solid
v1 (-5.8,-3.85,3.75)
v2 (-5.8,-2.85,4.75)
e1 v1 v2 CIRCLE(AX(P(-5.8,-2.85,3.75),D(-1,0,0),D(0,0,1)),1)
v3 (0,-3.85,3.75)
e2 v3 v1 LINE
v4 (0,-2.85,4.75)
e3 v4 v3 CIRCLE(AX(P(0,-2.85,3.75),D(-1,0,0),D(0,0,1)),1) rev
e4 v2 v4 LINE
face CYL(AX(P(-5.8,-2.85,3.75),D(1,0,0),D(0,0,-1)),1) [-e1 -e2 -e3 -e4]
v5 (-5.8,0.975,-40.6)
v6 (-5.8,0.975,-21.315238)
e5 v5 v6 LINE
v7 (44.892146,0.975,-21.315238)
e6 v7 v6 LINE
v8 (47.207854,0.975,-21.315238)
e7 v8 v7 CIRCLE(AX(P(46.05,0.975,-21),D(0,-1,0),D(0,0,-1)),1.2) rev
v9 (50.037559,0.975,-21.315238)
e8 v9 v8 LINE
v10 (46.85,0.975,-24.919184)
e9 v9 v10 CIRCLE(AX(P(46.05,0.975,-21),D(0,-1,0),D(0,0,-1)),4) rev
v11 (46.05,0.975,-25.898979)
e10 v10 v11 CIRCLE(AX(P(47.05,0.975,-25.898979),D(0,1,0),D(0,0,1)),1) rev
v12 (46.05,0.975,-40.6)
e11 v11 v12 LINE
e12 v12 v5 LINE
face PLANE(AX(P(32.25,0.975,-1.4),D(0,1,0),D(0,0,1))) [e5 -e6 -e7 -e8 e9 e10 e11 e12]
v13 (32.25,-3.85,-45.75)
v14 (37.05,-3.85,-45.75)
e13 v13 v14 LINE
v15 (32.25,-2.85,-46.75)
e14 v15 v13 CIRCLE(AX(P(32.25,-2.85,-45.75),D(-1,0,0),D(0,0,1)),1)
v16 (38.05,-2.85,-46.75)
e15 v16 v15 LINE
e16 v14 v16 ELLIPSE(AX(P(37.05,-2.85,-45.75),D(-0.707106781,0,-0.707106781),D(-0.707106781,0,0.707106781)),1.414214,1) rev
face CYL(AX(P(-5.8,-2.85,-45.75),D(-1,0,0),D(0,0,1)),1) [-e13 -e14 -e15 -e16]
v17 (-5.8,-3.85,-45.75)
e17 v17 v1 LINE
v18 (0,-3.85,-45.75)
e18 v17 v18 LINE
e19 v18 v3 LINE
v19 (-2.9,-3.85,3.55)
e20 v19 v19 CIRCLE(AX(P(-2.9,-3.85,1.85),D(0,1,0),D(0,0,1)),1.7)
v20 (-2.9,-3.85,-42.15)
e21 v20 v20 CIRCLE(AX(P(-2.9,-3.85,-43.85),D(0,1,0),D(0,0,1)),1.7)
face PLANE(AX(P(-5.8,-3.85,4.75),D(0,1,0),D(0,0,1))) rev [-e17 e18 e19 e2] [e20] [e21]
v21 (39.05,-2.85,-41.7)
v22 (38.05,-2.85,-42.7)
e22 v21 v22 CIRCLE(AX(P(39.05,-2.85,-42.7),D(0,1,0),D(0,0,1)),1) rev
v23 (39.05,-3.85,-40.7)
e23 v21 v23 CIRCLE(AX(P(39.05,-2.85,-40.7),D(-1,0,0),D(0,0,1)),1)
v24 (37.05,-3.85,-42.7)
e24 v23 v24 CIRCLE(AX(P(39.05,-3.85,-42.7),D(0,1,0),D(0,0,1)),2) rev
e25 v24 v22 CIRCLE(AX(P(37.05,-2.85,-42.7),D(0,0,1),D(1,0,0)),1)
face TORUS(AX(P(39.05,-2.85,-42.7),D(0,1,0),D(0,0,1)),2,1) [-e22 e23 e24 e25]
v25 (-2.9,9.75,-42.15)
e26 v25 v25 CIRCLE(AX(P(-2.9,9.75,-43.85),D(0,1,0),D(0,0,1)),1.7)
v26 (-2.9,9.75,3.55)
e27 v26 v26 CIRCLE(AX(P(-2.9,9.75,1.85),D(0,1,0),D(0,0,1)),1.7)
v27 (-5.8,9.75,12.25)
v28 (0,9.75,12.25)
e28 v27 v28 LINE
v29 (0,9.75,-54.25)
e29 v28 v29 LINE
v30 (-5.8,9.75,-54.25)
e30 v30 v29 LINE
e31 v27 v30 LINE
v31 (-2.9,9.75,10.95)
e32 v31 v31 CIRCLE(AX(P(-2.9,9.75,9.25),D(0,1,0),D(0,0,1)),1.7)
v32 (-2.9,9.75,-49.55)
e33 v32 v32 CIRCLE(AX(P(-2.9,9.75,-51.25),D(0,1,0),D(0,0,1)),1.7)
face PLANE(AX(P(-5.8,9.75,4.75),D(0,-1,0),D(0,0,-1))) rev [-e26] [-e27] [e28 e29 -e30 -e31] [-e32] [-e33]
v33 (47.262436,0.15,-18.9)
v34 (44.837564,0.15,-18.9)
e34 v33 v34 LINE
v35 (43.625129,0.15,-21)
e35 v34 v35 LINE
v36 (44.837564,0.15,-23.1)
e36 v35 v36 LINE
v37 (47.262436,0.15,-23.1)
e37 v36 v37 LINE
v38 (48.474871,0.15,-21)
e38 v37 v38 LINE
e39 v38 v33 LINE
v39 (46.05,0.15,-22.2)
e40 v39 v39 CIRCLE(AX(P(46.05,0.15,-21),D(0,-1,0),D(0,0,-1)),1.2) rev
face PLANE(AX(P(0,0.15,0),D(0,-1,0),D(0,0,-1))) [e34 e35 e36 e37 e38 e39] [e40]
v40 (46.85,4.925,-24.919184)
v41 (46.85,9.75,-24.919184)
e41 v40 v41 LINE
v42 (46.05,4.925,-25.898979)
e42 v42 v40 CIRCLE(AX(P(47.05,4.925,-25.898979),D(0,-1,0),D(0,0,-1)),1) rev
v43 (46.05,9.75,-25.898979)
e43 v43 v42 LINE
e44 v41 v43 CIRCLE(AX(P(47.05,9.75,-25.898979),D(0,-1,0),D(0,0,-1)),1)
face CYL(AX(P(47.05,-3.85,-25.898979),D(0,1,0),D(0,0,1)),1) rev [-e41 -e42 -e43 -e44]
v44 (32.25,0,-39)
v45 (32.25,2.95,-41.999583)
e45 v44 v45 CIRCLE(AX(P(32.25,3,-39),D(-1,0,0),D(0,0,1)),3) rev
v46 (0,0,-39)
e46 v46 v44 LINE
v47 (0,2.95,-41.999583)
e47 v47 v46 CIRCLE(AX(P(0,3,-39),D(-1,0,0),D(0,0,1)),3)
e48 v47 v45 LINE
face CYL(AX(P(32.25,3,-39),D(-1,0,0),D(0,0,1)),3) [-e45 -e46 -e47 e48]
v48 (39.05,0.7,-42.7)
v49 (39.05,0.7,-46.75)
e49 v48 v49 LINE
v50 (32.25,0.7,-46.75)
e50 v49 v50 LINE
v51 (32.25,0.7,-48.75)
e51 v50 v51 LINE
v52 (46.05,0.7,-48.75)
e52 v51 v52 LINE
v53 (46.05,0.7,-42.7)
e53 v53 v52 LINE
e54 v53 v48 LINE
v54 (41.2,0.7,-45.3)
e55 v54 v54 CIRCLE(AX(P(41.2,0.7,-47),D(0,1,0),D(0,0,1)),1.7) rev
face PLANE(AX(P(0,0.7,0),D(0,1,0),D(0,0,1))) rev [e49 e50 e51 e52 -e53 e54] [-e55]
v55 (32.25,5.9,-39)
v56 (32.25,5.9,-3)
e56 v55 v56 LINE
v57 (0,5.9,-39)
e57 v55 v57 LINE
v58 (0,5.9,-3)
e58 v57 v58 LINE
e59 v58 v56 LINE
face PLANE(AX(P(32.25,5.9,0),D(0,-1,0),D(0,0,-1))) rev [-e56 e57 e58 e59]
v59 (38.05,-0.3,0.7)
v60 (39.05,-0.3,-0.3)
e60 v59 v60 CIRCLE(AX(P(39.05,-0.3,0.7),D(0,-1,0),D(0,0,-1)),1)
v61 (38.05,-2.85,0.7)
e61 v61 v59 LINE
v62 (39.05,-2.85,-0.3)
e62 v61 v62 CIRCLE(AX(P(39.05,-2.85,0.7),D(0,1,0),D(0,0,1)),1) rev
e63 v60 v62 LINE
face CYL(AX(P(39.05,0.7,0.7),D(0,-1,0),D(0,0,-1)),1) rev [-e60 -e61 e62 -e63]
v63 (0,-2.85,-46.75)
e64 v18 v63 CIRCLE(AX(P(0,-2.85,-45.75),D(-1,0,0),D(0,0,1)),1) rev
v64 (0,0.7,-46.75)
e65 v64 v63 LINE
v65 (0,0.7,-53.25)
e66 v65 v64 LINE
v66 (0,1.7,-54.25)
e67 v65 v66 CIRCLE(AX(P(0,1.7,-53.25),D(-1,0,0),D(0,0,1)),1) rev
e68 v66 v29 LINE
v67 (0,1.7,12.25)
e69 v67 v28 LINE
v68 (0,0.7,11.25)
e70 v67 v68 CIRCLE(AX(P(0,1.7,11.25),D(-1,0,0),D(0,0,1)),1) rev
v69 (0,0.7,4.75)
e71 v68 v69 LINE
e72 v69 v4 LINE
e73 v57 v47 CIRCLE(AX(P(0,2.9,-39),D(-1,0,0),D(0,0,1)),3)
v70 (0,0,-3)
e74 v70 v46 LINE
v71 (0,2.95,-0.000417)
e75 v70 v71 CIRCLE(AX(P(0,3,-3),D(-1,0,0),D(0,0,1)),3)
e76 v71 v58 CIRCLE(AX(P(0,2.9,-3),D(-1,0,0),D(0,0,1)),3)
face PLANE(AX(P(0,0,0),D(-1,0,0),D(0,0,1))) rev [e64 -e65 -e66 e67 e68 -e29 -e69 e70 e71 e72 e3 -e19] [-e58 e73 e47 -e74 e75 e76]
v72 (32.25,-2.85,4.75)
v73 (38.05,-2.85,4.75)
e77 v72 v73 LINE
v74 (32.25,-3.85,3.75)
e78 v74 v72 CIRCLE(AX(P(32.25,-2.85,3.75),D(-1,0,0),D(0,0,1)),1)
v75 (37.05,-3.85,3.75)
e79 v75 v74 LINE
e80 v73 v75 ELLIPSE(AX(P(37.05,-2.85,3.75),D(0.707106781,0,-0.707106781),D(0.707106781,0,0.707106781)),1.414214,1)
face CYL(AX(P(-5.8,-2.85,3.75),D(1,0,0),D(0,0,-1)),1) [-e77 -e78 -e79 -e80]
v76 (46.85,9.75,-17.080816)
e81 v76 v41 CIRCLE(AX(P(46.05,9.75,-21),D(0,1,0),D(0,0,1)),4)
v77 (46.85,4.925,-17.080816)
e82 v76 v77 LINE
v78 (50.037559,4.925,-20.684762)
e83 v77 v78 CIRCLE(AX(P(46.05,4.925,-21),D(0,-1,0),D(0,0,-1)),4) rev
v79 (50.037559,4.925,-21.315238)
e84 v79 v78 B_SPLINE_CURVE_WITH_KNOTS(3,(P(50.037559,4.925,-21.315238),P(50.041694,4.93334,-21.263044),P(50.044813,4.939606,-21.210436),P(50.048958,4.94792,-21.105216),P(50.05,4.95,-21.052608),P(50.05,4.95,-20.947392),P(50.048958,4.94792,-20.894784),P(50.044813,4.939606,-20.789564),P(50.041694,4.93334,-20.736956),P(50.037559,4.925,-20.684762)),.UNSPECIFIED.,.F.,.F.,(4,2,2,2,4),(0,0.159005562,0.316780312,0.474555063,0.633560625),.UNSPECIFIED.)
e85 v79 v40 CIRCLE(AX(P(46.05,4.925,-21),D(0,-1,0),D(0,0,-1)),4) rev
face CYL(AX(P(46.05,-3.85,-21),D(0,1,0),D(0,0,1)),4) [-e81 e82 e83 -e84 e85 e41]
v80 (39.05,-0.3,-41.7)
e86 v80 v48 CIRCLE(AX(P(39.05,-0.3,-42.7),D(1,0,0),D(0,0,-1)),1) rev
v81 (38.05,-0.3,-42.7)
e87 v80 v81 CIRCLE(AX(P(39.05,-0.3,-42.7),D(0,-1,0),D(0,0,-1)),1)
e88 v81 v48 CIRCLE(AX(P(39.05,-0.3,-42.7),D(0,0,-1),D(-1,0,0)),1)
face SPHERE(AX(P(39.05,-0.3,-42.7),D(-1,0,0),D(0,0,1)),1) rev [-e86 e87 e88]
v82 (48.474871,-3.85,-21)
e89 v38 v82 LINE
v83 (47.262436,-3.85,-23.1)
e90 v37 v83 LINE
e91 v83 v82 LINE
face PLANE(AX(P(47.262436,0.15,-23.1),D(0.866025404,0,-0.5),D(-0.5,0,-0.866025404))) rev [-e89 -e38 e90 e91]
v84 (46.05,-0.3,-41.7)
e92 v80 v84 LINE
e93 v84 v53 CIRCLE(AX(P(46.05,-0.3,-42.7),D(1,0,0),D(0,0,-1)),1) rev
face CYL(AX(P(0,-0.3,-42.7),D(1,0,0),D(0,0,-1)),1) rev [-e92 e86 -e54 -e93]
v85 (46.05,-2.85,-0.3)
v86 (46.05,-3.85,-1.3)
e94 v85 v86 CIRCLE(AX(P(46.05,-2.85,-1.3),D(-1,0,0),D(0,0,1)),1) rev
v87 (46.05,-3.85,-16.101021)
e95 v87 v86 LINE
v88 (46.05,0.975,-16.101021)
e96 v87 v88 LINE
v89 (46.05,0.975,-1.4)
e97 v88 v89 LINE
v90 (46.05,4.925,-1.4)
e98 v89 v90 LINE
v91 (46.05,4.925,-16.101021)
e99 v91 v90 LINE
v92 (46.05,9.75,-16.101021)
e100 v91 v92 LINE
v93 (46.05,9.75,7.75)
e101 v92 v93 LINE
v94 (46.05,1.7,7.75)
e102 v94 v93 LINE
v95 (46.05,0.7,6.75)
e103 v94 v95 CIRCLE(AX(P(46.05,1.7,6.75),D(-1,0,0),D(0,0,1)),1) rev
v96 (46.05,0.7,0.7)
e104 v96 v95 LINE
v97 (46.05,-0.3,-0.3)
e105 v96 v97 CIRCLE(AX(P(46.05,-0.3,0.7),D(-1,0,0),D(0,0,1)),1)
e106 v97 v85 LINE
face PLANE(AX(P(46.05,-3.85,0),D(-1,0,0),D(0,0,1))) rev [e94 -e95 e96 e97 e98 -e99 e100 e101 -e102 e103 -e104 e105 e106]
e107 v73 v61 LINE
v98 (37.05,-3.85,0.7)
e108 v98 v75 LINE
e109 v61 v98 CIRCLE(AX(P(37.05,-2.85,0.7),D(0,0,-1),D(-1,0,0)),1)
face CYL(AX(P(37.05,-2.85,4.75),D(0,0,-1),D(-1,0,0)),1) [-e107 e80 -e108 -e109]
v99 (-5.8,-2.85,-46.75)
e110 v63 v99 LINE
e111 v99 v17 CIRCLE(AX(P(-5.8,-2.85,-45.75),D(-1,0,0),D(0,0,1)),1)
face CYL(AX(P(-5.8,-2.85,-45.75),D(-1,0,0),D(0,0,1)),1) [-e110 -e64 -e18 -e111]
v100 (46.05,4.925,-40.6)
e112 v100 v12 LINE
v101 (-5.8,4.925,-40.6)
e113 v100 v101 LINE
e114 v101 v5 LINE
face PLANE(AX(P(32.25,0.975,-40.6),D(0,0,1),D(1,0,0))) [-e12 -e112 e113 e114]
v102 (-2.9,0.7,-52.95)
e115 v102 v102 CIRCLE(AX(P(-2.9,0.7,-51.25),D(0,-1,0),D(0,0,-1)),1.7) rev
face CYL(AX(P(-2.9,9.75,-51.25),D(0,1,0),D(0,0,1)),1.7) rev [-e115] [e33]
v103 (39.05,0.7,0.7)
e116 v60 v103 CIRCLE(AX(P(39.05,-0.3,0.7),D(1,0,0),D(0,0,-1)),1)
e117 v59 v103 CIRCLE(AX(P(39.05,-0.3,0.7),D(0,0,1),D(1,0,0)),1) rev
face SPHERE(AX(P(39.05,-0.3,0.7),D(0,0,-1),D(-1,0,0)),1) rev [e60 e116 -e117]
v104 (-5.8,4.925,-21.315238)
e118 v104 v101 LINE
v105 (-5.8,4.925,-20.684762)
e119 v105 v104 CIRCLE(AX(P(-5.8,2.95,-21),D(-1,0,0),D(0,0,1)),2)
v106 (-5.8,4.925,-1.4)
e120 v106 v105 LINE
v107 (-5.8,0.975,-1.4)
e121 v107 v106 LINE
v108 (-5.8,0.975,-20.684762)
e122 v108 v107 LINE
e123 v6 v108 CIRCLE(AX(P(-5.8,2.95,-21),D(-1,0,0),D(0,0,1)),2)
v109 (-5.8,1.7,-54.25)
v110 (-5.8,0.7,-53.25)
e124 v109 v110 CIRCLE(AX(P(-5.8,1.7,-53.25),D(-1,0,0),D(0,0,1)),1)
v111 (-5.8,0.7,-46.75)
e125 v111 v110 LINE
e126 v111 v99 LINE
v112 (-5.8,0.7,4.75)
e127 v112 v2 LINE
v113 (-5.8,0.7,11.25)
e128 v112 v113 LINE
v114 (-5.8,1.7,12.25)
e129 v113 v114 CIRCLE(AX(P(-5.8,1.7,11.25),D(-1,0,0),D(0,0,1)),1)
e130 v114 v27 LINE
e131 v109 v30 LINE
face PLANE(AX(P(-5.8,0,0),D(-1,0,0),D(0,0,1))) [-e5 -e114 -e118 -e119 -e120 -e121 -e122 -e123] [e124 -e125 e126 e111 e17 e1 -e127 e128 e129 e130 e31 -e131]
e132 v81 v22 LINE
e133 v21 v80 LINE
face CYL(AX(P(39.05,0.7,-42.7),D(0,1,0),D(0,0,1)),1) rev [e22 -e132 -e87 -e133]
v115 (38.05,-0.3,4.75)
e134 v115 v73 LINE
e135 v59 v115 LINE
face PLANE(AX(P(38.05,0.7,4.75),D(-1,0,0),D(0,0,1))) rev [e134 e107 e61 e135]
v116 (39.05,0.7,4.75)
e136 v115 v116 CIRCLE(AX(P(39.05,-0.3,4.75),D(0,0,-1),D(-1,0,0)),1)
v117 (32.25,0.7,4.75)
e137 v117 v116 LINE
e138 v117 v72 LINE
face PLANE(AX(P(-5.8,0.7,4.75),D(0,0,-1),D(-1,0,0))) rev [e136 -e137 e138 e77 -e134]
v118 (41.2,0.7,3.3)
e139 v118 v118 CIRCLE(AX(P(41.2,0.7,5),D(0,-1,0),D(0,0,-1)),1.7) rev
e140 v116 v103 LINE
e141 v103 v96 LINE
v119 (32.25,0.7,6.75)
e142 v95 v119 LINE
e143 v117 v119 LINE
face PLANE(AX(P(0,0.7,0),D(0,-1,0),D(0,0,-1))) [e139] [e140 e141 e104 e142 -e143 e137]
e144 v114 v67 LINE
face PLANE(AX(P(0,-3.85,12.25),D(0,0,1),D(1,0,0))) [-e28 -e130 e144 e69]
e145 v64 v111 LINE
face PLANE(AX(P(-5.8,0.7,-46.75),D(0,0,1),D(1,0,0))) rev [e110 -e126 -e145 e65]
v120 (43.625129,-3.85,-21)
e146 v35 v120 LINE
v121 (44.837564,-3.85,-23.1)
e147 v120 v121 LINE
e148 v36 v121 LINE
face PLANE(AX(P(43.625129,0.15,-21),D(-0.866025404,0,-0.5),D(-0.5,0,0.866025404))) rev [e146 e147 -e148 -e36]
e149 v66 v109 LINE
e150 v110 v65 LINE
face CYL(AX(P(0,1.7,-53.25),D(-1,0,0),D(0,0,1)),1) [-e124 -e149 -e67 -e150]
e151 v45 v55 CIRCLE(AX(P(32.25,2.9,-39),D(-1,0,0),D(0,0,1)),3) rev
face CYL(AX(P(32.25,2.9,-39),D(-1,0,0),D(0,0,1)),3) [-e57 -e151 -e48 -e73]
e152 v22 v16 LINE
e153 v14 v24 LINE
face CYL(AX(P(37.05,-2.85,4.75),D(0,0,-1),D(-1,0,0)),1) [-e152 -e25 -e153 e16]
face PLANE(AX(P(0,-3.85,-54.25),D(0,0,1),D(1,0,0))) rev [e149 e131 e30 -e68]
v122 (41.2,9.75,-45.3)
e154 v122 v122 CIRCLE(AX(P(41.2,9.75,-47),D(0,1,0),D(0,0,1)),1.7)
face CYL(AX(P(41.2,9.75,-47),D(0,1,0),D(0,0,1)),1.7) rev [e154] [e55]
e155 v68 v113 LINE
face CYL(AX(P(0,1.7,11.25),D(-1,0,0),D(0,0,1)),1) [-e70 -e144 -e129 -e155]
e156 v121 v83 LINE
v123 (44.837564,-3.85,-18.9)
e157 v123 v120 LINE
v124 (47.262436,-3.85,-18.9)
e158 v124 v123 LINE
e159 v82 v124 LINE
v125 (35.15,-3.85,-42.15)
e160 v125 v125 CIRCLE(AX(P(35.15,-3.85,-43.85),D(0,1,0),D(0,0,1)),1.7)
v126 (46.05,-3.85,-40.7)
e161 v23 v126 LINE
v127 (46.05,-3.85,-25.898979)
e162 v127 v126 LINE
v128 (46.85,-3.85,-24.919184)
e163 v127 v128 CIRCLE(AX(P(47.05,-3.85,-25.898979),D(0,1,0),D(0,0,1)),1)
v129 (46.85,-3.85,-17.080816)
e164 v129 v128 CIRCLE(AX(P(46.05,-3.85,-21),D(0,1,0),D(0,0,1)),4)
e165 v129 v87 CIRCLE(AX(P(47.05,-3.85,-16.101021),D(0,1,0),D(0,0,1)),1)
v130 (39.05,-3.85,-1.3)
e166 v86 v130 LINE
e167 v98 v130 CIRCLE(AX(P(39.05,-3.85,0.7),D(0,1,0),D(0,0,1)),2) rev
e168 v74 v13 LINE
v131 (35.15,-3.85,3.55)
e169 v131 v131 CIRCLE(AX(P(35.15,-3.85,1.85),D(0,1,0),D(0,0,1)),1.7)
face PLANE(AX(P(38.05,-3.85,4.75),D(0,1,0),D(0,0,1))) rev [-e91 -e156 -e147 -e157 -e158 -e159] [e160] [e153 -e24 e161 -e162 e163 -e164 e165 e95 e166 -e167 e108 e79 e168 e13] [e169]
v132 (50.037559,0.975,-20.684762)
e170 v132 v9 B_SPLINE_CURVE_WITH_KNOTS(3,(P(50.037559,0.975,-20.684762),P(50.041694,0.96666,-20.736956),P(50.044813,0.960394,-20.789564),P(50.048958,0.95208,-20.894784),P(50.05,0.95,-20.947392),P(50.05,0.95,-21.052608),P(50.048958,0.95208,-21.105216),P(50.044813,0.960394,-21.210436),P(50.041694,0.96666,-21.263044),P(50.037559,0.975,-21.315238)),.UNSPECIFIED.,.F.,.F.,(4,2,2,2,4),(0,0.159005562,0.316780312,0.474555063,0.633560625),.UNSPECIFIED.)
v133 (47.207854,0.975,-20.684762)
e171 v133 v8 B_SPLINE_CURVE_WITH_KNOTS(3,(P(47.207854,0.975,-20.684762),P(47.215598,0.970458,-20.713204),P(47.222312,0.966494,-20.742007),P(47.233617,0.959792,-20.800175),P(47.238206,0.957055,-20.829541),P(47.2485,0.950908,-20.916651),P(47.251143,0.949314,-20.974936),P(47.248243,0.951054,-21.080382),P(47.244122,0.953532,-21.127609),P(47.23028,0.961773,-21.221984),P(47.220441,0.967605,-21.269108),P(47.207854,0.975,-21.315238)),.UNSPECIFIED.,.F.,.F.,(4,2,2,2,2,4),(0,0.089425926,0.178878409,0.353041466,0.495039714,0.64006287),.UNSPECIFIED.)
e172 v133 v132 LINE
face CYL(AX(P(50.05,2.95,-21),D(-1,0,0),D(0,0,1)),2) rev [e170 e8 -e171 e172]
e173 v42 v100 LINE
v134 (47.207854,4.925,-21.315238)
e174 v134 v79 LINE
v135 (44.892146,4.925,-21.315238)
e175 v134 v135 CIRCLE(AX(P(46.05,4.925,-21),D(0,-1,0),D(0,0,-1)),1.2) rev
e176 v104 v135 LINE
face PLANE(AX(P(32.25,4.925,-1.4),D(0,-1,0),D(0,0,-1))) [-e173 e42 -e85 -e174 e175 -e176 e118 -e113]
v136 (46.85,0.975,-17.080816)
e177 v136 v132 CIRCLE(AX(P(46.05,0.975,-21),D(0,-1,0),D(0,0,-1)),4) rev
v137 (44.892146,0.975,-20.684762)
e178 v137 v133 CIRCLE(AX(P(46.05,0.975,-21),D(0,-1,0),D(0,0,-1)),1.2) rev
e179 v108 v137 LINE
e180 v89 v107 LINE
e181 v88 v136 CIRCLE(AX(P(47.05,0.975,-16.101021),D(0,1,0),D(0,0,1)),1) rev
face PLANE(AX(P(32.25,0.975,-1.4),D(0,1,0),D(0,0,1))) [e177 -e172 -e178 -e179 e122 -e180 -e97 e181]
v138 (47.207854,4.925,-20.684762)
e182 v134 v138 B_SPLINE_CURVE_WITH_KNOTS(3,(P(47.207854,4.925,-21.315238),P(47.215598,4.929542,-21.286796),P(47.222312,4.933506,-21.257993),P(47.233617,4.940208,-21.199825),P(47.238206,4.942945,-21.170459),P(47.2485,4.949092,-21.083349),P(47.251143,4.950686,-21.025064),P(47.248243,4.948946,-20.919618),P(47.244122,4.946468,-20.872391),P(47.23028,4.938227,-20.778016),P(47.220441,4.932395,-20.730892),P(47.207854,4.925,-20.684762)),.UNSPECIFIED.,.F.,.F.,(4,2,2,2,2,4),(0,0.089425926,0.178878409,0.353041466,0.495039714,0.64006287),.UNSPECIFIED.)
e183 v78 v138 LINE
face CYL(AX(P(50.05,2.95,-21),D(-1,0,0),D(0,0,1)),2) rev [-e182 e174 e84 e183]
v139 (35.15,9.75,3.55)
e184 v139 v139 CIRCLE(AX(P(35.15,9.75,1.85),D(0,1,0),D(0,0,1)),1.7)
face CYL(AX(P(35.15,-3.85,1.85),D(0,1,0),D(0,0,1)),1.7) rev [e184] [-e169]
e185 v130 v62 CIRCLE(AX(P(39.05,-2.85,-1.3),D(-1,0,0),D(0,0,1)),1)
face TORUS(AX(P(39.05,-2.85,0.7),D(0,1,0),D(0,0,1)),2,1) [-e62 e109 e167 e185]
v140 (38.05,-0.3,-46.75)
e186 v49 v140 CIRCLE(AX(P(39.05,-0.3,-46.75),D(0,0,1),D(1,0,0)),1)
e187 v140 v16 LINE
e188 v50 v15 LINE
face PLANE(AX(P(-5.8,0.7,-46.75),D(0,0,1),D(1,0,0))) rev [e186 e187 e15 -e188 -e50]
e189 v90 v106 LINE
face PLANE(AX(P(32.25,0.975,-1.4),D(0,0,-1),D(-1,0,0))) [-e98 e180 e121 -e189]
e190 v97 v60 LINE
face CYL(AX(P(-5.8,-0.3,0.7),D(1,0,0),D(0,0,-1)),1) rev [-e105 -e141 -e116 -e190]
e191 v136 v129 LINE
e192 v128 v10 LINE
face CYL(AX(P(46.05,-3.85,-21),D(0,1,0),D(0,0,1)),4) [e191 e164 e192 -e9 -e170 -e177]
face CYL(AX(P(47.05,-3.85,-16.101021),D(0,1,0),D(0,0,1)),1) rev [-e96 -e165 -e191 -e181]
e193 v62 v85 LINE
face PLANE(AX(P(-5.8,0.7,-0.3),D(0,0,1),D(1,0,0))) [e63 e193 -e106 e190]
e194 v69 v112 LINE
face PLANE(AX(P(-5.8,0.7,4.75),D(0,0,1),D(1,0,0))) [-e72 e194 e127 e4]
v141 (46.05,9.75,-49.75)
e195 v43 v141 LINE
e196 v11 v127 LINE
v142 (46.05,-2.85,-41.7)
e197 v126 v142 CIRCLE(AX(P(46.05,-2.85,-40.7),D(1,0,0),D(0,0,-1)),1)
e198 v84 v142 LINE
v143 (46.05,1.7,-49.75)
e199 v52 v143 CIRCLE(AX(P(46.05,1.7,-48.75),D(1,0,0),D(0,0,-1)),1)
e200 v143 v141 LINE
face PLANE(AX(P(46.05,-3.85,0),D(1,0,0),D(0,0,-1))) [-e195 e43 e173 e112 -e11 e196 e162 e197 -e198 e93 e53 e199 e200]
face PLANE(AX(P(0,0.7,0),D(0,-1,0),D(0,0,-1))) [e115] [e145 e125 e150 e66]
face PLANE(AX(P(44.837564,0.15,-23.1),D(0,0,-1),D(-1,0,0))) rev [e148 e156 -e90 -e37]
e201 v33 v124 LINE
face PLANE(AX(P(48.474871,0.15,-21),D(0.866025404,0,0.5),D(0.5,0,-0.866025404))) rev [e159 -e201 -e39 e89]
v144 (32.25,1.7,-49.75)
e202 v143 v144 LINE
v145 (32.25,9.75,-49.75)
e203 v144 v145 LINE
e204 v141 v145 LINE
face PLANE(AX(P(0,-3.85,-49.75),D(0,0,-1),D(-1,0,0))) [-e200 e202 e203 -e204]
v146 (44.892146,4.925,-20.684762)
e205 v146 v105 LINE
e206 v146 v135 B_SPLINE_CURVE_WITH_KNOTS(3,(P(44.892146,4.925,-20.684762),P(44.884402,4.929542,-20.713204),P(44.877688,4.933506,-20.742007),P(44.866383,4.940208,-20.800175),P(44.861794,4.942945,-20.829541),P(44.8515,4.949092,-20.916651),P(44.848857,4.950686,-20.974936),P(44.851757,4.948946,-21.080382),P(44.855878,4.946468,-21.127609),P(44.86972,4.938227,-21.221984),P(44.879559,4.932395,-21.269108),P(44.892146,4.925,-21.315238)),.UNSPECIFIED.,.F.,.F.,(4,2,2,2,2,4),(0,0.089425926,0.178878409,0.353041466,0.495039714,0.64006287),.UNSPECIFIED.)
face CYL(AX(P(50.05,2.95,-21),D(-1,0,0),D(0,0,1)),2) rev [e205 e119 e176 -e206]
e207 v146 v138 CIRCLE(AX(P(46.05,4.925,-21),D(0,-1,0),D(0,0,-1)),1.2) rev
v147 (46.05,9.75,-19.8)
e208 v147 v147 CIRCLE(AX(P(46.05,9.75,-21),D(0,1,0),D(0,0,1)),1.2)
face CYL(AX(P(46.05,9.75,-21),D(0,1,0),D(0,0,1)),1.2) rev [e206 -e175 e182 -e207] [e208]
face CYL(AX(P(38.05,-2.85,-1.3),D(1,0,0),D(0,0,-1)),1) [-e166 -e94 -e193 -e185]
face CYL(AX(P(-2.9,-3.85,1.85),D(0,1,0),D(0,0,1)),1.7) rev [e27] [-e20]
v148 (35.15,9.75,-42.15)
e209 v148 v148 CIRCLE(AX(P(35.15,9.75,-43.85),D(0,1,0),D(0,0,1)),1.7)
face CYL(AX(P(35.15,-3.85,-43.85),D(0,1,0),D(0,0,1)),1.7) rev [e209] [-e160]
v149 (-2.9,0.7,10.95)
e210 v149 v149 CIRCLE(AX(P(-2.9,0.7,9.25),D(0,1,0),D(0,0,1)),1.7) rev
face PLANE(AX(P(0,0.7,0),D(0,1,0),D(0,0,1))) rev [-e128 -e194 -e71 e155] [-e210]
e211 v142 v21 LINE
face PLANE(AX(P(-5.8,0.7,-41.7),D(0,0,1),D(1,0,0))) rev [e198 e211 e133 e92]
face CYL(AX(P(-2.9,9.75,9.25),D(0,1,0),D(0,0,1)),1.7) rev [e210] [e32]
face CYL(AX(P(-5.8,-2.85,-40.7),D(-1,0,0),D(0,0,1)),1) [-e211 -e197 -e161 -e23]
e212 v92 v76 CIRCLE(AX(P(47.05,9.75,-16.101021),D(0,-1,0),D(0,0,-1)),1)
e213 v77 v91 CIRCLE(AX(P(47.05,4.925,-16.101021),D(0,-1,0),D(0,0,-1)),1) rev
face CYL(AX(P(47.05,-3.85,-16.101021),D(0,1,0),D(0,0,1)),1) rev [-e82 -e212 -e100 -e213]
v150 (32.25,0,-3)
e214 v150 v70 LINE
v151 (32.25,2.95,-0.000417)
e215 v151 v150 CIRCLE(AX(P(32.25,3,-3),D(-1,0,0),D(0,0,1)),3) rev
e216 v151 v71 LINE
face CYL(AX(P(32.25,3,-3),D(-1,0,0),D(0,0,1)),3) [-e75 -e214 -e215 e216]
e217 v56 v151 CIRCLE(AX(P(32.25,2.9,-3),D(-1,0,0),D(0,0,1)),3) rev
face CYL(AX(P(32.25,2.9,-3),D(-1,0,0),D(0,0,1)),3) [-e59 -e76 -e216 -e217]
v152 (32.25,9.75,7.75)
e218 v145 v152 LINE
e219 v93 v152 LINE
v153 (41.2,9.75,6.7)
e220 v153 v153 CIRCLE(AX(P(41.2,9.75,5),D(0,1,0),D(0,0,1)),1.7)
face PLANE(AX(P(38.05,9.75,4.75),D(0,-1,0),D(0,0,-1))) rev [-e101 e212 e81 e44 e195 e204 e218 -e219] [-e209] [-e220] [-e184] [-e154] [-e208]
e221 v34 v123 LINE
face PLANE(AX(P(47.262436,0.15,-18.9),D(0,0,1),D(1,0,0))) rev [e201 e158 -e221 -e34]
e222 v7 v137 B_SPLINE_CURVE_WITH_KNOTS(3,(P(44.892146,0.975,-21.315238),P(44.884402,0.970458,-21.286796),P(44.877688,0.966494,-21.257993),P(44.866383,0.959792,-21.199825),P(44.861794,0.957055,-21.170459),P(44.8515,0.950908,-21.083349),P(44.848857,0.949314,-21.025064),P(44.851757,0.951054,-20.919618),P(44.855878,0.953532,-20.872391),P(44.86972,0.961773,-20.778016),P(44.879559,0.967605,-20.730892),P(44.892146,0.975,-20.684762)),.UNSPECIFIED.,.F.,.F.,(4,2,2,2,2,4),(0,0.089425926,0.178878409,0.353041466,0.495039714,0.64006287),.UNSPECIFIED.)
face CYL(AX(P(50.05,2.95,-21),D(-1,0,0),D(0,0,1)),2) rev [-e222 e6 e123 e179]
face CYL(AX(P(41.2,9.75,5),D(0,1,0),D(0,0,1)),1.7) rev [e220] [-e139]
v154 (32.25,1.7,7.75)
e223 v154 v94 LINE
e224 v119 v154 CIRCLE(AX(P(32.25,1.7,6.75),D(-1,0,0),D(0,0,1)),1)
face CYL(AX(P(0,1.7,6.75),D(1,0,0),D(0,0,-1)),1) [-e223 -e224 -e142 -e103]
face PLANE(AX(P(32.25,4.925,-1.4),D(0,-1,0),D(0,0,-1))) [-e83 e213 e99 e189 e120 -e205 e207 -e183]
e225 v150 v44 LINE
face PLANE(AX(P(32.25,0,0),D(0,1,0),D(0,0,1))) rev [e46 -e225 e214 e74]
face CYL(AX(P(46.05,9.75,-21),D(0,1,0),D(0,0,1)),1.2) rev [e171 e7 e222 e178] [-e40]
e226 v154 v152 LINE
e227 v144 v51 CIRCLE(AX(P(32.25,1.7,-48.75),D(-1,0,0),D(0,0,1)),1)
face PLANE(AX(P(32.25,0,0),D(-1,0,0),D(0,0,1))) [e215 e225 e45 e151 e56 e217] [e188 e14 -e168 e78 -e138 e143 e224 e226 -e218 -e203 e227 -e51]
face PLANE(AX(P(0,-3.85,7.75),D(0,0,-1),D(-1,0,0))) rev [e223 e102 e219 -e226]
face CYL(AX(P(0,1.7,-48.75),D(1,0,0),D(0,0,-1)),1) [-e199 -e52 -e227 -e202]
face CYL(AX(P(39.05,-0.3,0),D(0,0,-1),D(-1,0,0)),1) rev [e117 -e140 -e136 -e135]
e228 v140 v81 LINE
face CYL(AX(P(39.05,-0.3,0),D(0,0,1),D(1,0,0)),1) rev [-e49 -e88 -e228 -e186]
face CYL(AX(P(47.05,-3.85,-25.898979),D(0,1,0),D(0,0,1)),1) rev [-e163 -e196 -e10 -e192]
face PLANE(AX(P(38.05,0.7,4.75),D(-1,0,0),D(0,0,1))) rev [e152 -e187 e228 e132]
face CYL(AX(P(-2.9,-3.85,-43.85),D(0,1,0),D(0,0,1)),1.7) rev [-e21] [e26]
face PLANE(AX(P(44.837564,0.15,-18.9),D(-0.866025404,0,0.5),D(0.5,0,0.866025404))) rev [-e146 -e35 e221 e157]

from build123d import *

# Parameters (mm, degrees)
SKETCH1_W              = 42
SKETCH1_H              = 5.9
SKETCH1_W_2            = 39.2
SKETCH1_H_2            = 3.95
BOSS_EXTRUDE1_DEPTH    = 32.25
FILLET2_R              = 3
SKETCH2_W              = 51.5
SKETCH2_H              = 13.6
SKETCH2_W_2            = 39.2
SKETCH2_H_2            = 3.95
BOSS_EXTRUDE2_DEPTH    = 5.8
SKETCH3_W              = 51.5
SKETCH3_H              = 13.6
SKETCH3_W_2            = 39.2
SKETCH3_H_2            = 3.95
BOSS_EXTRUDE3_DEPTH    = 5.8
SKETCH4_R              = 1.7
CUT_EXTRUDE1_DEPTH     = 62.792596644
SKETCH8_W              = 5.8
SKETCH8_H              = 7.5
BOSS_EXTRUDE4_DEPTH    = 13.6
M2_CLEARANCE_HOLE1_D   = 2.4
CUT_EXTRUDE4_DEPTH     = 4
SKETCH15_W             = 39.2
SKETCH15_H             = 3.95
CUT_EXTRUDE5_DEPTH     = 79.468767672
SKETCH17_R             = 2
CUT_EXTRUDE6_DEPTH     = 79.468767672
M3_CLEARANCE_HOLE1_D   = 3.4
CUT_EXTRUDE8_START     = -13.6
CUT_EXTRUDE8_OUTLINE_W = 5.8
CUT_EXTRUDE8_OUTLINE_H = 7.5
CUT_EXTRUDE8_OUTLINE_R = 1.7
CUT_EXTRUDE8_DEPTH     = 4.55
FILLET3_R              = 1


# Read off the part's stored shape, not the designer's step: Cut-Extrude8
with BuildPart() as part:
    # Sketch1 → Boss-Extrude1 (new body)
    with BuildSketch(Plane(origin=(0, 0, 0), x_dir=(0, 0, -1), z_dir=(1, 0, 0))):
        with Locations((21, 2.95)):
            Rectangle(SKETCH1_W, SKETCH1_H)
        with Locations((21, 2.95)):
            Rectangle(SKETCH1_W_2, SKETCH1_H_2, mode=Mode.SUBTRACT)
    extrude(amount=BOSS_EXTRUDE1_DEPTH)

    # Fillet2
    # the kernel refuses this fillet: 3 mm, written as the material it takes off along each edge
    with BuildSketch(Plane(origin=(-7.5, 0, -42), x_dir=(0, 0, 1), z_dir=(1, 0, 0)), Plane(origin=(-7.5, 5.9, 0), x_dir=(0, 0, -1), z_dir=(1, 0, 0)), Plane(origin=(-7.5, 5.9, -42), x_dir=(0, -1, 0), z_dir=(1, 0, 0))) as fillet2_piece_1:
        with BuildLine():
            CenterArc((FILLET2_R, -FILLET2_R), FILLET2_R, 90, 90)
            Line((0, -FILLET2_R), (0, 0))
            Line((0, 0), (FILLET2_R, 0))
        make_face()
    extrude(amount=47.25, mode=Mode.SUBTRACT)
    with BuildSketch(Plane(origin=(-7.5, 0, 0), x_dir=(0, 0, -1), z_dir=(1, 0, 0))) as fillet2_piece_2:
        with BuildLine():
            CenterArc((FILLET2_R, FILLET2_R), FILLET2_R, 180, 90)
            Line((0, FILLET2_R), (0, 0))
            Line((0, 0), (FILLET2_R, 0))
        make_face()
    extrude(amount=47.25, mode=Mode.SUBTRACT)

    # Sketch2 → Boss-Extrude2 (add)
    with BuildSketch(Plane(origin=(32.25, 0, 0), x_dir=(0, 0, -1), z_dir=(1, 0, 0))):
        with Locations((21, 2.95)):
            Rectangle(SKETCH2_W, SKETCH2_H)
        with Locations((21, 2.95)):
            Rectangle(SKETCH2_W_2, SKETCH2_H_2, mode=Mode.SUBTRACT)
    extrude(amount=BOSS_EXTRUDE2_DEPTH)

    # Sketch3 → Boss-Extrude3 (add)
    with BuildSketch(Plane.ZY):
        with Locations((-21, 2.95)):
            Rectangle(SKETCH3_W, SKETCH3_H)
        with Locations((-21, 2.95)):
            Rectangle(SKETCH3_W_2, SKETCH3_H_2, mode=Mode.SUBTRACT)
    extrude(amount=BOSS_EXTRUDE3_DEPTH)

    # Sketch4 → Cut-Extrude1 (cut, through all)
    with BuildSketch(Plane(origin=(0, 9.75, 0), x_dir=(1, 0, 0), z_dir=(0, 1, 0))):
        with Locations(Location((-2.9, 43.85, 0), (0, 0, 270))):
            Circle(SKETCH4_R)
        with Locations(Location((35.15, 43.85, 0), (0, 0, 270))):
            Circle(SKETCH4_R)
        with Locations(Location((-2.9, -1.85, 0), (0, 0, 270))):
            Circle(SKETCH4_R)
        with Locations(Location((35.15, -1.85, 0), (0, 0, 270))):
            Circle(SKETCH4_R)
    extrude(amount=-CUT_EXTRUDE1_DEPTH, mode=Mode.SUBTRACT)

    # Sketch8 → Boss-Extrude4 (add)
    with BuildSketch(Plane(origin=(0, 9.75, 0), x_dir=(1, 0, 0), z_dir=(0, 1, 0))):
        with Locations((-2.9, 50.5)):
            Rectangle(SKETCH8_W, SKETCH8_H)
        with Locations((-2.9, -8.5)):
            Rectangle(SKETCH8_W, SKETCH8_H)
        with BuildLine():
            Line((46.05, 25), (46.05, 49.75))
            Line((46.05, 49.75), (32.25, 49.75))
            Line((32.25, 49.75), (32.25, 46.75))
            Line((32.25, 46.75), (38.05, 46.75))
            Line((38.05, 46.75), (38.05, -4.75))
            Line((38.05, -4.75), (32.25, -4.75))
            Line((32.25, -4.75), (32.25, -7.75))
            Line((32.25, -7.75), (46.05, -7.75))
            Line((46.05, -7.75), (46.05, 17))
            ThreePointArc((46.05, 17), (50.05, 21), (46.05, 25))
        make_face()
    extrude(amount=-BOSS_EXTRUDE4_DEPTH)

    # M2 Clearance Hole1 (through all)
    with Locations(Plane(origin=(0, 9.75, 0), x_dir=(1, 0, 0), z_dir=(0, 1, 0))):
        with Locations((46.05, 21)):
            Hole(M2_CLEARANCE_HOLE1_D / 2)

    # Sketch14 → Cut-Extrude4 (cut)
    with BuildSketch(Plane.XZ.offset(3.85)):
        Polygon((43.625128869, -21), (44.837564435, -23.1), (47.262435565, -23.1), (48.474871131, -21), (47.262435565, -18.9), (44.837564435, -18.9), align=None)
    extrude(amount=-CUT_EXTRUDE4_DEPTH, mode=Mode.SUBTRACT)

    # Sketch15 → Cut-Extrude5 (cut, through all)
    with BuildSketch(Plane.ZY.offset(5.8)):
        with Locations((-21, 2.95)):
            Rectangle(SKETCH15_W, SKETCH15_H)
    extrude(amount=-CUT_EXTRUDE5_DEPTH, mode=Mode.SUBTRACT)

    # Sketch17 → Cut-Extrude6 (cut, through all)
    with BuildSketch(Plane.ZY.offset(5.8)):
        with Locations((-21, 2.95)):
            Circle(SKETCH17_R)
    extrude(amount=-CUT_EXTRUDE6_DEPTH, mode=Mode.SUBTRACT)

    # M3 Clearance Hole1 (through all)
    with Locations(Plane(origin=(-2.9, 9.75, -51.25), x_dir=(0, 0, 1), z_dir=(0, 1, 0))):
        with Locations((0, 0), (4.25, 44.1), (56.25, 44.1), (60.5, 0)):
            Hole(M3_CLEARANCE_HOLE1_D / 2)

    # Cut-Extrude8 outline → Cut-Extrude8 (cut)
    # profile 1 of 4: a face of its own
    with BuildSketch(Plane(origin=(0, 9.75, 0), x_dir=(1, 0, 0), z_dir=(0, 1, 0)).offset(CUT_EXTRUDE8_START)):
        with Locations((-2.9, 50.5)):
            Rectangle(CUT_EXTRUDE8_OUTLINE_W, CUT_EXTRUDE8_OUTLINE_H)
        with Locations((-2.9, 51.25)):
            Circle(CUT_EXTRUDE8_OUTLINE_R, mode=Mode.SUBTRACT)
    # profile 2 of 4: a face of its own
    with BuildSketch(Plane(origin=(0, 9.75, 0), x_dir=(1, 0, 0), z_dir=(0, 1, 0)).offset(CUT_EXTRUDE8_START)):
        with Locations((-2.9, -8.5)):
            Rectangle(CUT_EXTRUDE8_OUTLINE_W, CUT_EXTRUDE8_OUTLINE_H)
        with Locations((-2.9, -9.25)):
            Circle(CUT_EXTRUDE8_OUTLINE_R, mode=Mode.SUBTRACT)
    # profile 3 of 4: a face of its own
    with BuildSketch(Plane(origin=(0, 9.75, 0), x_dir=(1, 0, 0), z_dir=(0, 1, 0)).offset(CUT_EXTRUDE8_START)):
        Polygon((32.25, 49.75), (32.25, 46.75), (38.05, 46.75), (38.05, 41.7), (46.05, 41.7), (46.05, 49.75), align=None)
        with Locations((41.2, 47)):
            Circle(CUT_EXTRUDE8_OUTLINE_R, mode=Mode.SUBTRACT)
    # profile 4 of 4: a face of its own
    with BuildSketch(Plane(origin=(0, 9.75, 0), x_dir=(1, 0, 0), z_dir=(0, 1, 0)).offset(CUT_EXTRUDE8_START)):
        Polygon((38.05, -4.75), (32.25, -4.75), (32.25, -7.75), (46.05, -7.75), (46.05, 0.3), (38.05, 0.3), align=None)
        with Locations((41.2, -5)):
            Circle(CUT_EXTRUDE8_OUTLINE_R, mode=Mode.SUBTRACT)
    extrude(amount=CUT_EXTRUDE8_DEPTH, mode=Mode.SUBTRACT)

    # Fillet3
    fillet3_edges = [part.edges().sort_by_distance(p)[0] for p in [
        (46.05, -1.4375, -25),
        (46.05, -1.4375, -17),
        (46.05, 7.3375, -17),
        (46.05, 7.3375, -25),
        (39.15, 0.7, -49.75),
        (42.05, -3.85, -41.7),
        (38.05, -3.85, -44.225),
        (35.15, -3.85, -46.75),
        (38.05, 0.7, -44.225),
        (42.05, 0.7, -41.7),
        (38.05, -1.575, -41.7),
        (42.05, 0.7, -0.3),
        (35.15, -3.85, 4.75),
        (38.05, -3.85, 2.225),
        (39.15, 0.7, 7.75),
        (42.05, -3.85, -0.3),
        (38.05, 0.7, 2.225),
        (38.05, -1.575, -0.3),
        (-2.9, 0.7, 12.25),
        (-2.9, -3.85, 4.75),
        (-2.9, -3.85, -46.75),
        (-2.9, 0.7, -54.25),
    ]]
    fillet(fillet3_edges, radius=FILLET3_R)


solid = part.part
